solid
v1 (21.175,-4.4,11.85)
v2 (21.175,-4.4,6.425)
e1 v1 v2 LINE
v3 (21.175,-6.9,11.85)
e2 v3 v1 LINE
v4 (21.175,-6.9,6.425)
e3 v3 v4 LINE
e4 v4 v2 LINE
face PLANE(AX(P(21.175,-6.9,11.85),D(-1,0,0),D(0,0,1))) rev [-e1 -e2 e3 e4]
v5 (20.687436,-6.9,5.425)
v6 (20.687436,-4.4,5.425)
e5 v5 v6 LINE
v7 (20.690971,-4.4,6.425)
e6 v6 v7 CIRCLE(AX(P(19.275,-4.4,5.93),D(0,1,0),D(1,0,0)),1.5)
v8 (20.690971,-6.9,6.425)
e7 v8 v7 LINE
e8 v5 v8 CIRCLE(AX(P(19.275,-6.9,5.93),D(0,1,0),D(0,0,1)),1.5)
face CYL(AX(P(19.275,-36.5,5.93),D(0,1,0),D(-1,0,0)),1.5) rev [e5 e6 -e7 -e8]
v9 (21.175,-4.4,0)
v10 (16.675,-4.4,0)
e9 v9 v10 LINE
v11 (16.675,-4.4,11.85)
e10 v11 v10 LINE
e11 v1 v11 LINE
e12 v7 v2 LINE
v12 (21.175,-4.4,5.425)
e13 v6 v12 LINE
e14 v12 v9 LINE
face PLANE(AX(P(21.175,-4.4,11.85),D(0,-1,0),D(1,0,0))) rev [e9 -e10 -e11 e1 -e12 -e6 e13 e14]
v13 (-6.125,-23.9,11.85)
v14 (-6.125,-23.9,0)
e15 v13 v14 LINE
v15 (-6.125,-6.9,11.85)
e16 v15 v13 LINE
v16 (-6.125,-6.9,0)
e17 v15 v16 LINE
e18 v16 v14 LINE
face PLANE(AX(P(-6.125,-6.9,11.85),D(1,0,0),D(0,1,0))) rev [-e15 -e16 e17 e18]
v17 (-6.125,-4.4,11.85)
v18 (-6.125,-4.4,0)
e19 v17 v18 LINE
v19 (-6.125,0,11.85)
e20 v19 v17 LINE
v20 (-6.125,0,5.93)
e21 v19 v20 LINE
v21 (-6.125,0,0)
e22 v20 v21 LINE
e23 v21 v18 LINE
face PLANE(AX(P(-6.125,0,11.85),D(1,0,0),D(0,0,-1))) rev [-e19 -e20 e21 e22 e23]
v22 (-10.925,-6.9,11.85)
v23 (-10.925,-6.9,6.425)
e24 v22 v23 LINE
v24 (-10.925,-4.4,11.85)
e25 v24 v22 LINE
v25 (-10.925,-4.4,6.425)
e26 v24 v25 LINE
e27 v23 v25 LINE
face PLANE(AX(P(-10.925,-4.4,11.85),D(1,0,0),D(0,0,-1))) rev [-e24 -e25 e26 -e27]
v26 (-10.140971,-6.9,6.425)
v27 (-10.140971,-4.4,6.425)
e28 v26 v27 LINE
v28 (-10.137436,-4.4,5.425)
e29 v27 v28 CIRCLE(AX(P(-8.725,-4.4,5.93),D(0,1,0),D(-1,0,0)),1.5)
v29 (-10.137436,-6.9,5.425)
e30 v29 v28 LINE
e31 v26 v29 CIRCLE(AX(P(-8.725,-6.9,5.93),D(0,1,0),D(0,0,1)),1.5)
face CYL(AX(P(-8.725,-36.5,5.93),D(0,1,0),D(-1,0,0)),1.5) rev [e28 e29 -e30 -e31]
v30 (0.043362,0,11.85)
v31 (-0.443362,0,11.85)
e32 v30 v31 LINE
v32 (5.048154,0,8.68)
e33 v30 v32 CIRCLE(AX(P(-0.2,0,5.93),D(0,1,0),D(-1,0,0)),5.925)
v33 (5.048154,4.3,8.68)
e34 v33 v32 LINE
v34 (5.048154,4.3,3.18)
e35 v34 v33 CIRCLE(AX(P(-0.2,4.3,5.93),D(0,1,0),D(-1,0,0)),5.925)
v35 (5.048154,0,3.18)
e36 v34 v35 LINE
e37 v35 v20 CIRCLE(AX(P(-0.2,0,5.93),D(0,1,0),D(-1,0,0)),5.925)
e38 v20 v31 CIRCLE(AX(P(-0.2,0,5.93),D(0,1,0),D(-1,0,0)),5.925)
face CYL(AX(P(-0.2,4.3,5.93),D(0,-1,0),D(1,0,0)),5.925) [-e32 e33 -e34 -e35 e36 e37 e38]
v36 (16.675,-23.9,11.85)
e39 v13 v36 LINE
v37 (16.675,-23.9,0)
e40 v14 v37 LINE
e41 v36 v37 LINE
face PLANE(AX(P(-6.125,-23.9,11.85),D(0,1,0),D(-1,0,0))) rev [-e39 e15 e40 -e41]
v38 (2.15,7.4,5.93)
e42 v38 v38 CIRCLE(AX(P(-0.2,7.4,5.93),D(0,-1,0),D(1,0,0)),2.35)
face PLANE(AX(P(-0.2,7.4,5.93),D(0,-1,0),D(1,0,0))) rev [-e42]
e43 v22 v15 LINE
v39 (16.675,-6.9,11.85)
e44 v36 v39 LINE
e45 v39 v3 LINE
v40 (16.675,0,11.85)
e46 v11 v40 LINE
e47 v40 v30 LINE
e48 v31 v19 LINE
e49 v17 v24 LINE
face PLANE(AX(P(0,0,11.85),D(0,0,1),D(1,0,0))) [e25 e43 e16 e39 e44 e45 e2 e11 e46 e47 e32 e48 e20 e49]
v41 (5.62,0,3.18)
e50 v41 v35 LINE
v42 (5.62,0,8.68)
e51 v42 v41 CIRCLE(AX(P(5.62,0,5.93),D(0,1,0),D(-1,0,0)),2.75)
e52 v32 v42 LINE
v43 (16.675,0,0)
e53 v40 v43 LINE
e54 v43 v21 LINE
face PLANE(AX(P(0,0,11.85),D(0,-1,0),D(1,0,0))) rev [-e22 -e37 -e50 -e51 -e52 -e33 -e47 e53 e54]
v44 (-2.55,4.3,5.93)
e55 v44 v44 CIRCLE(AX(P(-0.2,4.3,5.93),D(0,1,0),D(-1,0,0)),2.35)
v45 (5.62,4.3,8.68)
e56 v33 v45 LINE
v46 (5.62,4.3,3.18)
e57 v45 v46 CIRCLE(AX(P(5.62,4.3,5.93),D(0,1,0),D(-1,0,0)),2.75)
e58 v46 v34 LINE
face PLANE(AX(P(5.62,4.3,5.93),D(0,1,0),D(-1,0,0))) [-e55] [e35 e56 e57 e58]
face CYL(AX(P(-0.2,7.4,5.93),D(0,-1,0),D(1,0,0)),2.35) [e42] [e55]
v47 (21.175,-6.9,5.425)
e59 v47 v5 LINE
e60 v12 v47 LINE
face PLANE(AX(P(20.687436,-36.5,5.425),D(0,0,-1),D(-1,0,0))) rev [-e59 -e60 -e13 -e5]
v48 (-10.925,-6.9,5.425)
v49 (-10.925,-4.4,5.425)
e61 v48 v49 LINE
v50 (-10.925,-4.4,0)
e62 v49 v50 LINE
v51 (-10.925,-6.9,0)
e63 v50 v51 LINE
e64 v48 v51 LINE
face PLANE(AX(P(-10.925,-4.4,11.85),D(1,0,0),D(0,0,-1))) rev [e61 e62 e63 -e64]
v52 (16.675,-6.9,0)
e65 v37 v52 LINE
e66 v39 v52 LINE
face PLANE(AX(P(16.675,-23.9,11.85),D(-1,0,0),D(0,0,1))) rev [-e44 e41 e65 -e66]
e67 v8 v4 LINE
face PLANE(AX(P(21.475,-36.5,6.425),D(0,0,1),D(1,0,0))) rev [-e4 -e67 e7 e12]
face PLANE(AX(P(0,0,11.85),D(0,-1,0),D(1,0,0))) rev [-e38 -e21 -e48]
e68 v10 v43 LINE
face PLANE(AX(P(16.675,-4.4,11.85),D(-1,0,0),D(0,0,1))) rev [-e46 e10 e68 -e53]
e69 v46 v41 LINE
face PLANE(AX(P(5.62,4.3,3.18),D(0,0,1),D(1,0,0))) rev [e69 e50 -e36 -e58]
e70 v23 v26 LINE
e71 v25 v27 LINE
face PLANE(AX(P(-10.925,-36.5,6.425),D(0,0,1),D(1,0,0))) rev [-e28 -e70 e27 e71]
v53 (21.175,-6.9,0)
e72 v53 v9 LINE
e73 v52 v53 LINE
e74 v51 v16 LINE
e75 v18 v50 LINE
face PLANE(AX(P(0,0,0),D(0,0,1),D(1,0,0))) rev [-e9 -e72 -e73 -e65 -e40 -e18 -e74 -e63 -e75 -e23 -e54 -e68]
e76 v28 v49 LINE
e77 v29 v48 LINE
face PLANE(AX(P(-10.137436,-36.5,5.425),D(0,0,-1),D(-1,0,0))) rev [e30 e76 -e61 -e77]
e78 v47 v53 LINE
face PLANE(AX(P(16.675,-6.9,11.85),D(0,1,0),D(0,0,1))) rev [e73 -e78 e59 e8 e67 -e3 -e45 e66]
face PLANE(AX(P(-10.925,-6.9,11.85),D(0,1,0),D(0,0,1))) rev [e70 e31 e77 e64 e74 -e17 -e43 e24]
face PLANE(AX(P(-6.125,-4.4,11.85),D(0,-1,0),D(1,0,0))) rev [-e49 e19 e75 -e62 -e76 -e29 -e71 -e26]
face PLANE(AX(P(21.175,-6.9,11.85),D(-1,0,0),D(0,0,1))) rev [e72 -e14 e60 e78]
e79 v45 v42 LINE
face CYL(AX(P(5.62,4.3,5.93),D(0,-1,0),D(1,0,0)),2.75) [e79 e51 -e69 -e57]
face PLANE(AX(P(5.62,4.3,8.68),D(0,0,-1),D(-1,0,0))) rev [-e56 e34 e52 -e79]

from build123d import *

# Parameters (mm, degrees)
BOSS_EXTRUDE1_DEPTH = 11.85
BOSS_EXTRUDE2_DEPTH = 4.3
SKETCH4_R           = 2.35
BOSS_EXTRUDE3_DEPTH = 31.3
CUT_EXTRUDE1_DEPTH  = 32.1


with BuildPart() as part:
    # Sketch1 → Boss-Extrude1 (new body)
    with BuildSketch(Plane.XY):
        Polygon((0, 0), (-6.125, 0), (-6.125, -4.4), (-10.925, -4.4), (-10.925, -6.9), (-6.125, -6.9), (-6.125, -23.9), (16.675, -23.9), (16.675, -6.9), (21.175, -6.9), (21.175, -4.4), (16.675, -4.4), (16.675, 0), align=None)
    extrude(amount=BOSS_EXTRUDE1_DEPTH)

    # Boss-Extrude2: read off the stored shape, not the designer's step
    # Boss-Extrude2 outline → Boss-Extrude2 (add)
    with BuildSketch(Plane(origin=(0, 0, 0), x_dir=(1, 0, 0), z_dir=(0, 1, 0))):
        with BuildLine():
            Line((5.048154438, -8.68), (5.62, -8.68))
            ThreePointArc((5.62, -8.68), (8.37, -5.93), (5.62, -3.18))
            Line((5.62, -3.18), (5.048154438, -3.18))
            ThreePointArc((5.048154438, -3.18), (-5.20541828, -2.759603678), (-0.44336187, -11.85))
            Line((-0.44336187, -11.85), (0.04336187, -11.85))
            ThreePointArc((0.04336187, -11.85), (2.970396322, -10.93541828), (5.048154438, -8.68))
        make_face()
    extrude(amount=BOSS_EXTRUDE2_DEPTH)

    # Sketch4 → Boss-Extrude3 (add)
    with BuildSketch(Plane.XZ.offset(23.9)):
        with Locations((-0.2, 5.93)):
            Circle(SKETCH4_R)
    extrude(amount=-BOSS_EXTRUDE3_DEPTH)

    # Sketch5 → Cut-Extrude1 (cut)
    with BuildSketch(Plane(origin=(0, -4.4, 0), x_dir=(1, 0, 0), z_dir=(0, 1, 0))):
        with BuildLine():
            Line((-10.137435839, -5.425), (-10.925, -5.425))
            Line((-10.925, -5.425), (-10.925, -5.925))
            Line((-10.925, -5.925), (-10.925, -6.425))
            Line((-10.925, -6.425), (-10.140971398, -6.425))
            ThreePointArc((-10.140971398, -6.425), (-7.225009375, -5.935303305), (-10.137435839, -5.425))
        make_face()
        with BuildLine():
            Line((20.687435839, -5.425), (21.475, -5.425))
            Line((21.475, -5.425), (21.475, -5.925))
            Line((21.475, -5.925), (21.475, -6.425))
            Line((21.475, -6.425), (20.690971398, -6.425))
            ThreePointArc((20.690971398, -6.425), (17.775009375, -5.935303305), (20.687435839, -5.425))
        make_face()
    extrude(amount=-CUT_EXTRUDE1_DEPTH, mode=Mode.SUBTRACT)


solid = part.part
